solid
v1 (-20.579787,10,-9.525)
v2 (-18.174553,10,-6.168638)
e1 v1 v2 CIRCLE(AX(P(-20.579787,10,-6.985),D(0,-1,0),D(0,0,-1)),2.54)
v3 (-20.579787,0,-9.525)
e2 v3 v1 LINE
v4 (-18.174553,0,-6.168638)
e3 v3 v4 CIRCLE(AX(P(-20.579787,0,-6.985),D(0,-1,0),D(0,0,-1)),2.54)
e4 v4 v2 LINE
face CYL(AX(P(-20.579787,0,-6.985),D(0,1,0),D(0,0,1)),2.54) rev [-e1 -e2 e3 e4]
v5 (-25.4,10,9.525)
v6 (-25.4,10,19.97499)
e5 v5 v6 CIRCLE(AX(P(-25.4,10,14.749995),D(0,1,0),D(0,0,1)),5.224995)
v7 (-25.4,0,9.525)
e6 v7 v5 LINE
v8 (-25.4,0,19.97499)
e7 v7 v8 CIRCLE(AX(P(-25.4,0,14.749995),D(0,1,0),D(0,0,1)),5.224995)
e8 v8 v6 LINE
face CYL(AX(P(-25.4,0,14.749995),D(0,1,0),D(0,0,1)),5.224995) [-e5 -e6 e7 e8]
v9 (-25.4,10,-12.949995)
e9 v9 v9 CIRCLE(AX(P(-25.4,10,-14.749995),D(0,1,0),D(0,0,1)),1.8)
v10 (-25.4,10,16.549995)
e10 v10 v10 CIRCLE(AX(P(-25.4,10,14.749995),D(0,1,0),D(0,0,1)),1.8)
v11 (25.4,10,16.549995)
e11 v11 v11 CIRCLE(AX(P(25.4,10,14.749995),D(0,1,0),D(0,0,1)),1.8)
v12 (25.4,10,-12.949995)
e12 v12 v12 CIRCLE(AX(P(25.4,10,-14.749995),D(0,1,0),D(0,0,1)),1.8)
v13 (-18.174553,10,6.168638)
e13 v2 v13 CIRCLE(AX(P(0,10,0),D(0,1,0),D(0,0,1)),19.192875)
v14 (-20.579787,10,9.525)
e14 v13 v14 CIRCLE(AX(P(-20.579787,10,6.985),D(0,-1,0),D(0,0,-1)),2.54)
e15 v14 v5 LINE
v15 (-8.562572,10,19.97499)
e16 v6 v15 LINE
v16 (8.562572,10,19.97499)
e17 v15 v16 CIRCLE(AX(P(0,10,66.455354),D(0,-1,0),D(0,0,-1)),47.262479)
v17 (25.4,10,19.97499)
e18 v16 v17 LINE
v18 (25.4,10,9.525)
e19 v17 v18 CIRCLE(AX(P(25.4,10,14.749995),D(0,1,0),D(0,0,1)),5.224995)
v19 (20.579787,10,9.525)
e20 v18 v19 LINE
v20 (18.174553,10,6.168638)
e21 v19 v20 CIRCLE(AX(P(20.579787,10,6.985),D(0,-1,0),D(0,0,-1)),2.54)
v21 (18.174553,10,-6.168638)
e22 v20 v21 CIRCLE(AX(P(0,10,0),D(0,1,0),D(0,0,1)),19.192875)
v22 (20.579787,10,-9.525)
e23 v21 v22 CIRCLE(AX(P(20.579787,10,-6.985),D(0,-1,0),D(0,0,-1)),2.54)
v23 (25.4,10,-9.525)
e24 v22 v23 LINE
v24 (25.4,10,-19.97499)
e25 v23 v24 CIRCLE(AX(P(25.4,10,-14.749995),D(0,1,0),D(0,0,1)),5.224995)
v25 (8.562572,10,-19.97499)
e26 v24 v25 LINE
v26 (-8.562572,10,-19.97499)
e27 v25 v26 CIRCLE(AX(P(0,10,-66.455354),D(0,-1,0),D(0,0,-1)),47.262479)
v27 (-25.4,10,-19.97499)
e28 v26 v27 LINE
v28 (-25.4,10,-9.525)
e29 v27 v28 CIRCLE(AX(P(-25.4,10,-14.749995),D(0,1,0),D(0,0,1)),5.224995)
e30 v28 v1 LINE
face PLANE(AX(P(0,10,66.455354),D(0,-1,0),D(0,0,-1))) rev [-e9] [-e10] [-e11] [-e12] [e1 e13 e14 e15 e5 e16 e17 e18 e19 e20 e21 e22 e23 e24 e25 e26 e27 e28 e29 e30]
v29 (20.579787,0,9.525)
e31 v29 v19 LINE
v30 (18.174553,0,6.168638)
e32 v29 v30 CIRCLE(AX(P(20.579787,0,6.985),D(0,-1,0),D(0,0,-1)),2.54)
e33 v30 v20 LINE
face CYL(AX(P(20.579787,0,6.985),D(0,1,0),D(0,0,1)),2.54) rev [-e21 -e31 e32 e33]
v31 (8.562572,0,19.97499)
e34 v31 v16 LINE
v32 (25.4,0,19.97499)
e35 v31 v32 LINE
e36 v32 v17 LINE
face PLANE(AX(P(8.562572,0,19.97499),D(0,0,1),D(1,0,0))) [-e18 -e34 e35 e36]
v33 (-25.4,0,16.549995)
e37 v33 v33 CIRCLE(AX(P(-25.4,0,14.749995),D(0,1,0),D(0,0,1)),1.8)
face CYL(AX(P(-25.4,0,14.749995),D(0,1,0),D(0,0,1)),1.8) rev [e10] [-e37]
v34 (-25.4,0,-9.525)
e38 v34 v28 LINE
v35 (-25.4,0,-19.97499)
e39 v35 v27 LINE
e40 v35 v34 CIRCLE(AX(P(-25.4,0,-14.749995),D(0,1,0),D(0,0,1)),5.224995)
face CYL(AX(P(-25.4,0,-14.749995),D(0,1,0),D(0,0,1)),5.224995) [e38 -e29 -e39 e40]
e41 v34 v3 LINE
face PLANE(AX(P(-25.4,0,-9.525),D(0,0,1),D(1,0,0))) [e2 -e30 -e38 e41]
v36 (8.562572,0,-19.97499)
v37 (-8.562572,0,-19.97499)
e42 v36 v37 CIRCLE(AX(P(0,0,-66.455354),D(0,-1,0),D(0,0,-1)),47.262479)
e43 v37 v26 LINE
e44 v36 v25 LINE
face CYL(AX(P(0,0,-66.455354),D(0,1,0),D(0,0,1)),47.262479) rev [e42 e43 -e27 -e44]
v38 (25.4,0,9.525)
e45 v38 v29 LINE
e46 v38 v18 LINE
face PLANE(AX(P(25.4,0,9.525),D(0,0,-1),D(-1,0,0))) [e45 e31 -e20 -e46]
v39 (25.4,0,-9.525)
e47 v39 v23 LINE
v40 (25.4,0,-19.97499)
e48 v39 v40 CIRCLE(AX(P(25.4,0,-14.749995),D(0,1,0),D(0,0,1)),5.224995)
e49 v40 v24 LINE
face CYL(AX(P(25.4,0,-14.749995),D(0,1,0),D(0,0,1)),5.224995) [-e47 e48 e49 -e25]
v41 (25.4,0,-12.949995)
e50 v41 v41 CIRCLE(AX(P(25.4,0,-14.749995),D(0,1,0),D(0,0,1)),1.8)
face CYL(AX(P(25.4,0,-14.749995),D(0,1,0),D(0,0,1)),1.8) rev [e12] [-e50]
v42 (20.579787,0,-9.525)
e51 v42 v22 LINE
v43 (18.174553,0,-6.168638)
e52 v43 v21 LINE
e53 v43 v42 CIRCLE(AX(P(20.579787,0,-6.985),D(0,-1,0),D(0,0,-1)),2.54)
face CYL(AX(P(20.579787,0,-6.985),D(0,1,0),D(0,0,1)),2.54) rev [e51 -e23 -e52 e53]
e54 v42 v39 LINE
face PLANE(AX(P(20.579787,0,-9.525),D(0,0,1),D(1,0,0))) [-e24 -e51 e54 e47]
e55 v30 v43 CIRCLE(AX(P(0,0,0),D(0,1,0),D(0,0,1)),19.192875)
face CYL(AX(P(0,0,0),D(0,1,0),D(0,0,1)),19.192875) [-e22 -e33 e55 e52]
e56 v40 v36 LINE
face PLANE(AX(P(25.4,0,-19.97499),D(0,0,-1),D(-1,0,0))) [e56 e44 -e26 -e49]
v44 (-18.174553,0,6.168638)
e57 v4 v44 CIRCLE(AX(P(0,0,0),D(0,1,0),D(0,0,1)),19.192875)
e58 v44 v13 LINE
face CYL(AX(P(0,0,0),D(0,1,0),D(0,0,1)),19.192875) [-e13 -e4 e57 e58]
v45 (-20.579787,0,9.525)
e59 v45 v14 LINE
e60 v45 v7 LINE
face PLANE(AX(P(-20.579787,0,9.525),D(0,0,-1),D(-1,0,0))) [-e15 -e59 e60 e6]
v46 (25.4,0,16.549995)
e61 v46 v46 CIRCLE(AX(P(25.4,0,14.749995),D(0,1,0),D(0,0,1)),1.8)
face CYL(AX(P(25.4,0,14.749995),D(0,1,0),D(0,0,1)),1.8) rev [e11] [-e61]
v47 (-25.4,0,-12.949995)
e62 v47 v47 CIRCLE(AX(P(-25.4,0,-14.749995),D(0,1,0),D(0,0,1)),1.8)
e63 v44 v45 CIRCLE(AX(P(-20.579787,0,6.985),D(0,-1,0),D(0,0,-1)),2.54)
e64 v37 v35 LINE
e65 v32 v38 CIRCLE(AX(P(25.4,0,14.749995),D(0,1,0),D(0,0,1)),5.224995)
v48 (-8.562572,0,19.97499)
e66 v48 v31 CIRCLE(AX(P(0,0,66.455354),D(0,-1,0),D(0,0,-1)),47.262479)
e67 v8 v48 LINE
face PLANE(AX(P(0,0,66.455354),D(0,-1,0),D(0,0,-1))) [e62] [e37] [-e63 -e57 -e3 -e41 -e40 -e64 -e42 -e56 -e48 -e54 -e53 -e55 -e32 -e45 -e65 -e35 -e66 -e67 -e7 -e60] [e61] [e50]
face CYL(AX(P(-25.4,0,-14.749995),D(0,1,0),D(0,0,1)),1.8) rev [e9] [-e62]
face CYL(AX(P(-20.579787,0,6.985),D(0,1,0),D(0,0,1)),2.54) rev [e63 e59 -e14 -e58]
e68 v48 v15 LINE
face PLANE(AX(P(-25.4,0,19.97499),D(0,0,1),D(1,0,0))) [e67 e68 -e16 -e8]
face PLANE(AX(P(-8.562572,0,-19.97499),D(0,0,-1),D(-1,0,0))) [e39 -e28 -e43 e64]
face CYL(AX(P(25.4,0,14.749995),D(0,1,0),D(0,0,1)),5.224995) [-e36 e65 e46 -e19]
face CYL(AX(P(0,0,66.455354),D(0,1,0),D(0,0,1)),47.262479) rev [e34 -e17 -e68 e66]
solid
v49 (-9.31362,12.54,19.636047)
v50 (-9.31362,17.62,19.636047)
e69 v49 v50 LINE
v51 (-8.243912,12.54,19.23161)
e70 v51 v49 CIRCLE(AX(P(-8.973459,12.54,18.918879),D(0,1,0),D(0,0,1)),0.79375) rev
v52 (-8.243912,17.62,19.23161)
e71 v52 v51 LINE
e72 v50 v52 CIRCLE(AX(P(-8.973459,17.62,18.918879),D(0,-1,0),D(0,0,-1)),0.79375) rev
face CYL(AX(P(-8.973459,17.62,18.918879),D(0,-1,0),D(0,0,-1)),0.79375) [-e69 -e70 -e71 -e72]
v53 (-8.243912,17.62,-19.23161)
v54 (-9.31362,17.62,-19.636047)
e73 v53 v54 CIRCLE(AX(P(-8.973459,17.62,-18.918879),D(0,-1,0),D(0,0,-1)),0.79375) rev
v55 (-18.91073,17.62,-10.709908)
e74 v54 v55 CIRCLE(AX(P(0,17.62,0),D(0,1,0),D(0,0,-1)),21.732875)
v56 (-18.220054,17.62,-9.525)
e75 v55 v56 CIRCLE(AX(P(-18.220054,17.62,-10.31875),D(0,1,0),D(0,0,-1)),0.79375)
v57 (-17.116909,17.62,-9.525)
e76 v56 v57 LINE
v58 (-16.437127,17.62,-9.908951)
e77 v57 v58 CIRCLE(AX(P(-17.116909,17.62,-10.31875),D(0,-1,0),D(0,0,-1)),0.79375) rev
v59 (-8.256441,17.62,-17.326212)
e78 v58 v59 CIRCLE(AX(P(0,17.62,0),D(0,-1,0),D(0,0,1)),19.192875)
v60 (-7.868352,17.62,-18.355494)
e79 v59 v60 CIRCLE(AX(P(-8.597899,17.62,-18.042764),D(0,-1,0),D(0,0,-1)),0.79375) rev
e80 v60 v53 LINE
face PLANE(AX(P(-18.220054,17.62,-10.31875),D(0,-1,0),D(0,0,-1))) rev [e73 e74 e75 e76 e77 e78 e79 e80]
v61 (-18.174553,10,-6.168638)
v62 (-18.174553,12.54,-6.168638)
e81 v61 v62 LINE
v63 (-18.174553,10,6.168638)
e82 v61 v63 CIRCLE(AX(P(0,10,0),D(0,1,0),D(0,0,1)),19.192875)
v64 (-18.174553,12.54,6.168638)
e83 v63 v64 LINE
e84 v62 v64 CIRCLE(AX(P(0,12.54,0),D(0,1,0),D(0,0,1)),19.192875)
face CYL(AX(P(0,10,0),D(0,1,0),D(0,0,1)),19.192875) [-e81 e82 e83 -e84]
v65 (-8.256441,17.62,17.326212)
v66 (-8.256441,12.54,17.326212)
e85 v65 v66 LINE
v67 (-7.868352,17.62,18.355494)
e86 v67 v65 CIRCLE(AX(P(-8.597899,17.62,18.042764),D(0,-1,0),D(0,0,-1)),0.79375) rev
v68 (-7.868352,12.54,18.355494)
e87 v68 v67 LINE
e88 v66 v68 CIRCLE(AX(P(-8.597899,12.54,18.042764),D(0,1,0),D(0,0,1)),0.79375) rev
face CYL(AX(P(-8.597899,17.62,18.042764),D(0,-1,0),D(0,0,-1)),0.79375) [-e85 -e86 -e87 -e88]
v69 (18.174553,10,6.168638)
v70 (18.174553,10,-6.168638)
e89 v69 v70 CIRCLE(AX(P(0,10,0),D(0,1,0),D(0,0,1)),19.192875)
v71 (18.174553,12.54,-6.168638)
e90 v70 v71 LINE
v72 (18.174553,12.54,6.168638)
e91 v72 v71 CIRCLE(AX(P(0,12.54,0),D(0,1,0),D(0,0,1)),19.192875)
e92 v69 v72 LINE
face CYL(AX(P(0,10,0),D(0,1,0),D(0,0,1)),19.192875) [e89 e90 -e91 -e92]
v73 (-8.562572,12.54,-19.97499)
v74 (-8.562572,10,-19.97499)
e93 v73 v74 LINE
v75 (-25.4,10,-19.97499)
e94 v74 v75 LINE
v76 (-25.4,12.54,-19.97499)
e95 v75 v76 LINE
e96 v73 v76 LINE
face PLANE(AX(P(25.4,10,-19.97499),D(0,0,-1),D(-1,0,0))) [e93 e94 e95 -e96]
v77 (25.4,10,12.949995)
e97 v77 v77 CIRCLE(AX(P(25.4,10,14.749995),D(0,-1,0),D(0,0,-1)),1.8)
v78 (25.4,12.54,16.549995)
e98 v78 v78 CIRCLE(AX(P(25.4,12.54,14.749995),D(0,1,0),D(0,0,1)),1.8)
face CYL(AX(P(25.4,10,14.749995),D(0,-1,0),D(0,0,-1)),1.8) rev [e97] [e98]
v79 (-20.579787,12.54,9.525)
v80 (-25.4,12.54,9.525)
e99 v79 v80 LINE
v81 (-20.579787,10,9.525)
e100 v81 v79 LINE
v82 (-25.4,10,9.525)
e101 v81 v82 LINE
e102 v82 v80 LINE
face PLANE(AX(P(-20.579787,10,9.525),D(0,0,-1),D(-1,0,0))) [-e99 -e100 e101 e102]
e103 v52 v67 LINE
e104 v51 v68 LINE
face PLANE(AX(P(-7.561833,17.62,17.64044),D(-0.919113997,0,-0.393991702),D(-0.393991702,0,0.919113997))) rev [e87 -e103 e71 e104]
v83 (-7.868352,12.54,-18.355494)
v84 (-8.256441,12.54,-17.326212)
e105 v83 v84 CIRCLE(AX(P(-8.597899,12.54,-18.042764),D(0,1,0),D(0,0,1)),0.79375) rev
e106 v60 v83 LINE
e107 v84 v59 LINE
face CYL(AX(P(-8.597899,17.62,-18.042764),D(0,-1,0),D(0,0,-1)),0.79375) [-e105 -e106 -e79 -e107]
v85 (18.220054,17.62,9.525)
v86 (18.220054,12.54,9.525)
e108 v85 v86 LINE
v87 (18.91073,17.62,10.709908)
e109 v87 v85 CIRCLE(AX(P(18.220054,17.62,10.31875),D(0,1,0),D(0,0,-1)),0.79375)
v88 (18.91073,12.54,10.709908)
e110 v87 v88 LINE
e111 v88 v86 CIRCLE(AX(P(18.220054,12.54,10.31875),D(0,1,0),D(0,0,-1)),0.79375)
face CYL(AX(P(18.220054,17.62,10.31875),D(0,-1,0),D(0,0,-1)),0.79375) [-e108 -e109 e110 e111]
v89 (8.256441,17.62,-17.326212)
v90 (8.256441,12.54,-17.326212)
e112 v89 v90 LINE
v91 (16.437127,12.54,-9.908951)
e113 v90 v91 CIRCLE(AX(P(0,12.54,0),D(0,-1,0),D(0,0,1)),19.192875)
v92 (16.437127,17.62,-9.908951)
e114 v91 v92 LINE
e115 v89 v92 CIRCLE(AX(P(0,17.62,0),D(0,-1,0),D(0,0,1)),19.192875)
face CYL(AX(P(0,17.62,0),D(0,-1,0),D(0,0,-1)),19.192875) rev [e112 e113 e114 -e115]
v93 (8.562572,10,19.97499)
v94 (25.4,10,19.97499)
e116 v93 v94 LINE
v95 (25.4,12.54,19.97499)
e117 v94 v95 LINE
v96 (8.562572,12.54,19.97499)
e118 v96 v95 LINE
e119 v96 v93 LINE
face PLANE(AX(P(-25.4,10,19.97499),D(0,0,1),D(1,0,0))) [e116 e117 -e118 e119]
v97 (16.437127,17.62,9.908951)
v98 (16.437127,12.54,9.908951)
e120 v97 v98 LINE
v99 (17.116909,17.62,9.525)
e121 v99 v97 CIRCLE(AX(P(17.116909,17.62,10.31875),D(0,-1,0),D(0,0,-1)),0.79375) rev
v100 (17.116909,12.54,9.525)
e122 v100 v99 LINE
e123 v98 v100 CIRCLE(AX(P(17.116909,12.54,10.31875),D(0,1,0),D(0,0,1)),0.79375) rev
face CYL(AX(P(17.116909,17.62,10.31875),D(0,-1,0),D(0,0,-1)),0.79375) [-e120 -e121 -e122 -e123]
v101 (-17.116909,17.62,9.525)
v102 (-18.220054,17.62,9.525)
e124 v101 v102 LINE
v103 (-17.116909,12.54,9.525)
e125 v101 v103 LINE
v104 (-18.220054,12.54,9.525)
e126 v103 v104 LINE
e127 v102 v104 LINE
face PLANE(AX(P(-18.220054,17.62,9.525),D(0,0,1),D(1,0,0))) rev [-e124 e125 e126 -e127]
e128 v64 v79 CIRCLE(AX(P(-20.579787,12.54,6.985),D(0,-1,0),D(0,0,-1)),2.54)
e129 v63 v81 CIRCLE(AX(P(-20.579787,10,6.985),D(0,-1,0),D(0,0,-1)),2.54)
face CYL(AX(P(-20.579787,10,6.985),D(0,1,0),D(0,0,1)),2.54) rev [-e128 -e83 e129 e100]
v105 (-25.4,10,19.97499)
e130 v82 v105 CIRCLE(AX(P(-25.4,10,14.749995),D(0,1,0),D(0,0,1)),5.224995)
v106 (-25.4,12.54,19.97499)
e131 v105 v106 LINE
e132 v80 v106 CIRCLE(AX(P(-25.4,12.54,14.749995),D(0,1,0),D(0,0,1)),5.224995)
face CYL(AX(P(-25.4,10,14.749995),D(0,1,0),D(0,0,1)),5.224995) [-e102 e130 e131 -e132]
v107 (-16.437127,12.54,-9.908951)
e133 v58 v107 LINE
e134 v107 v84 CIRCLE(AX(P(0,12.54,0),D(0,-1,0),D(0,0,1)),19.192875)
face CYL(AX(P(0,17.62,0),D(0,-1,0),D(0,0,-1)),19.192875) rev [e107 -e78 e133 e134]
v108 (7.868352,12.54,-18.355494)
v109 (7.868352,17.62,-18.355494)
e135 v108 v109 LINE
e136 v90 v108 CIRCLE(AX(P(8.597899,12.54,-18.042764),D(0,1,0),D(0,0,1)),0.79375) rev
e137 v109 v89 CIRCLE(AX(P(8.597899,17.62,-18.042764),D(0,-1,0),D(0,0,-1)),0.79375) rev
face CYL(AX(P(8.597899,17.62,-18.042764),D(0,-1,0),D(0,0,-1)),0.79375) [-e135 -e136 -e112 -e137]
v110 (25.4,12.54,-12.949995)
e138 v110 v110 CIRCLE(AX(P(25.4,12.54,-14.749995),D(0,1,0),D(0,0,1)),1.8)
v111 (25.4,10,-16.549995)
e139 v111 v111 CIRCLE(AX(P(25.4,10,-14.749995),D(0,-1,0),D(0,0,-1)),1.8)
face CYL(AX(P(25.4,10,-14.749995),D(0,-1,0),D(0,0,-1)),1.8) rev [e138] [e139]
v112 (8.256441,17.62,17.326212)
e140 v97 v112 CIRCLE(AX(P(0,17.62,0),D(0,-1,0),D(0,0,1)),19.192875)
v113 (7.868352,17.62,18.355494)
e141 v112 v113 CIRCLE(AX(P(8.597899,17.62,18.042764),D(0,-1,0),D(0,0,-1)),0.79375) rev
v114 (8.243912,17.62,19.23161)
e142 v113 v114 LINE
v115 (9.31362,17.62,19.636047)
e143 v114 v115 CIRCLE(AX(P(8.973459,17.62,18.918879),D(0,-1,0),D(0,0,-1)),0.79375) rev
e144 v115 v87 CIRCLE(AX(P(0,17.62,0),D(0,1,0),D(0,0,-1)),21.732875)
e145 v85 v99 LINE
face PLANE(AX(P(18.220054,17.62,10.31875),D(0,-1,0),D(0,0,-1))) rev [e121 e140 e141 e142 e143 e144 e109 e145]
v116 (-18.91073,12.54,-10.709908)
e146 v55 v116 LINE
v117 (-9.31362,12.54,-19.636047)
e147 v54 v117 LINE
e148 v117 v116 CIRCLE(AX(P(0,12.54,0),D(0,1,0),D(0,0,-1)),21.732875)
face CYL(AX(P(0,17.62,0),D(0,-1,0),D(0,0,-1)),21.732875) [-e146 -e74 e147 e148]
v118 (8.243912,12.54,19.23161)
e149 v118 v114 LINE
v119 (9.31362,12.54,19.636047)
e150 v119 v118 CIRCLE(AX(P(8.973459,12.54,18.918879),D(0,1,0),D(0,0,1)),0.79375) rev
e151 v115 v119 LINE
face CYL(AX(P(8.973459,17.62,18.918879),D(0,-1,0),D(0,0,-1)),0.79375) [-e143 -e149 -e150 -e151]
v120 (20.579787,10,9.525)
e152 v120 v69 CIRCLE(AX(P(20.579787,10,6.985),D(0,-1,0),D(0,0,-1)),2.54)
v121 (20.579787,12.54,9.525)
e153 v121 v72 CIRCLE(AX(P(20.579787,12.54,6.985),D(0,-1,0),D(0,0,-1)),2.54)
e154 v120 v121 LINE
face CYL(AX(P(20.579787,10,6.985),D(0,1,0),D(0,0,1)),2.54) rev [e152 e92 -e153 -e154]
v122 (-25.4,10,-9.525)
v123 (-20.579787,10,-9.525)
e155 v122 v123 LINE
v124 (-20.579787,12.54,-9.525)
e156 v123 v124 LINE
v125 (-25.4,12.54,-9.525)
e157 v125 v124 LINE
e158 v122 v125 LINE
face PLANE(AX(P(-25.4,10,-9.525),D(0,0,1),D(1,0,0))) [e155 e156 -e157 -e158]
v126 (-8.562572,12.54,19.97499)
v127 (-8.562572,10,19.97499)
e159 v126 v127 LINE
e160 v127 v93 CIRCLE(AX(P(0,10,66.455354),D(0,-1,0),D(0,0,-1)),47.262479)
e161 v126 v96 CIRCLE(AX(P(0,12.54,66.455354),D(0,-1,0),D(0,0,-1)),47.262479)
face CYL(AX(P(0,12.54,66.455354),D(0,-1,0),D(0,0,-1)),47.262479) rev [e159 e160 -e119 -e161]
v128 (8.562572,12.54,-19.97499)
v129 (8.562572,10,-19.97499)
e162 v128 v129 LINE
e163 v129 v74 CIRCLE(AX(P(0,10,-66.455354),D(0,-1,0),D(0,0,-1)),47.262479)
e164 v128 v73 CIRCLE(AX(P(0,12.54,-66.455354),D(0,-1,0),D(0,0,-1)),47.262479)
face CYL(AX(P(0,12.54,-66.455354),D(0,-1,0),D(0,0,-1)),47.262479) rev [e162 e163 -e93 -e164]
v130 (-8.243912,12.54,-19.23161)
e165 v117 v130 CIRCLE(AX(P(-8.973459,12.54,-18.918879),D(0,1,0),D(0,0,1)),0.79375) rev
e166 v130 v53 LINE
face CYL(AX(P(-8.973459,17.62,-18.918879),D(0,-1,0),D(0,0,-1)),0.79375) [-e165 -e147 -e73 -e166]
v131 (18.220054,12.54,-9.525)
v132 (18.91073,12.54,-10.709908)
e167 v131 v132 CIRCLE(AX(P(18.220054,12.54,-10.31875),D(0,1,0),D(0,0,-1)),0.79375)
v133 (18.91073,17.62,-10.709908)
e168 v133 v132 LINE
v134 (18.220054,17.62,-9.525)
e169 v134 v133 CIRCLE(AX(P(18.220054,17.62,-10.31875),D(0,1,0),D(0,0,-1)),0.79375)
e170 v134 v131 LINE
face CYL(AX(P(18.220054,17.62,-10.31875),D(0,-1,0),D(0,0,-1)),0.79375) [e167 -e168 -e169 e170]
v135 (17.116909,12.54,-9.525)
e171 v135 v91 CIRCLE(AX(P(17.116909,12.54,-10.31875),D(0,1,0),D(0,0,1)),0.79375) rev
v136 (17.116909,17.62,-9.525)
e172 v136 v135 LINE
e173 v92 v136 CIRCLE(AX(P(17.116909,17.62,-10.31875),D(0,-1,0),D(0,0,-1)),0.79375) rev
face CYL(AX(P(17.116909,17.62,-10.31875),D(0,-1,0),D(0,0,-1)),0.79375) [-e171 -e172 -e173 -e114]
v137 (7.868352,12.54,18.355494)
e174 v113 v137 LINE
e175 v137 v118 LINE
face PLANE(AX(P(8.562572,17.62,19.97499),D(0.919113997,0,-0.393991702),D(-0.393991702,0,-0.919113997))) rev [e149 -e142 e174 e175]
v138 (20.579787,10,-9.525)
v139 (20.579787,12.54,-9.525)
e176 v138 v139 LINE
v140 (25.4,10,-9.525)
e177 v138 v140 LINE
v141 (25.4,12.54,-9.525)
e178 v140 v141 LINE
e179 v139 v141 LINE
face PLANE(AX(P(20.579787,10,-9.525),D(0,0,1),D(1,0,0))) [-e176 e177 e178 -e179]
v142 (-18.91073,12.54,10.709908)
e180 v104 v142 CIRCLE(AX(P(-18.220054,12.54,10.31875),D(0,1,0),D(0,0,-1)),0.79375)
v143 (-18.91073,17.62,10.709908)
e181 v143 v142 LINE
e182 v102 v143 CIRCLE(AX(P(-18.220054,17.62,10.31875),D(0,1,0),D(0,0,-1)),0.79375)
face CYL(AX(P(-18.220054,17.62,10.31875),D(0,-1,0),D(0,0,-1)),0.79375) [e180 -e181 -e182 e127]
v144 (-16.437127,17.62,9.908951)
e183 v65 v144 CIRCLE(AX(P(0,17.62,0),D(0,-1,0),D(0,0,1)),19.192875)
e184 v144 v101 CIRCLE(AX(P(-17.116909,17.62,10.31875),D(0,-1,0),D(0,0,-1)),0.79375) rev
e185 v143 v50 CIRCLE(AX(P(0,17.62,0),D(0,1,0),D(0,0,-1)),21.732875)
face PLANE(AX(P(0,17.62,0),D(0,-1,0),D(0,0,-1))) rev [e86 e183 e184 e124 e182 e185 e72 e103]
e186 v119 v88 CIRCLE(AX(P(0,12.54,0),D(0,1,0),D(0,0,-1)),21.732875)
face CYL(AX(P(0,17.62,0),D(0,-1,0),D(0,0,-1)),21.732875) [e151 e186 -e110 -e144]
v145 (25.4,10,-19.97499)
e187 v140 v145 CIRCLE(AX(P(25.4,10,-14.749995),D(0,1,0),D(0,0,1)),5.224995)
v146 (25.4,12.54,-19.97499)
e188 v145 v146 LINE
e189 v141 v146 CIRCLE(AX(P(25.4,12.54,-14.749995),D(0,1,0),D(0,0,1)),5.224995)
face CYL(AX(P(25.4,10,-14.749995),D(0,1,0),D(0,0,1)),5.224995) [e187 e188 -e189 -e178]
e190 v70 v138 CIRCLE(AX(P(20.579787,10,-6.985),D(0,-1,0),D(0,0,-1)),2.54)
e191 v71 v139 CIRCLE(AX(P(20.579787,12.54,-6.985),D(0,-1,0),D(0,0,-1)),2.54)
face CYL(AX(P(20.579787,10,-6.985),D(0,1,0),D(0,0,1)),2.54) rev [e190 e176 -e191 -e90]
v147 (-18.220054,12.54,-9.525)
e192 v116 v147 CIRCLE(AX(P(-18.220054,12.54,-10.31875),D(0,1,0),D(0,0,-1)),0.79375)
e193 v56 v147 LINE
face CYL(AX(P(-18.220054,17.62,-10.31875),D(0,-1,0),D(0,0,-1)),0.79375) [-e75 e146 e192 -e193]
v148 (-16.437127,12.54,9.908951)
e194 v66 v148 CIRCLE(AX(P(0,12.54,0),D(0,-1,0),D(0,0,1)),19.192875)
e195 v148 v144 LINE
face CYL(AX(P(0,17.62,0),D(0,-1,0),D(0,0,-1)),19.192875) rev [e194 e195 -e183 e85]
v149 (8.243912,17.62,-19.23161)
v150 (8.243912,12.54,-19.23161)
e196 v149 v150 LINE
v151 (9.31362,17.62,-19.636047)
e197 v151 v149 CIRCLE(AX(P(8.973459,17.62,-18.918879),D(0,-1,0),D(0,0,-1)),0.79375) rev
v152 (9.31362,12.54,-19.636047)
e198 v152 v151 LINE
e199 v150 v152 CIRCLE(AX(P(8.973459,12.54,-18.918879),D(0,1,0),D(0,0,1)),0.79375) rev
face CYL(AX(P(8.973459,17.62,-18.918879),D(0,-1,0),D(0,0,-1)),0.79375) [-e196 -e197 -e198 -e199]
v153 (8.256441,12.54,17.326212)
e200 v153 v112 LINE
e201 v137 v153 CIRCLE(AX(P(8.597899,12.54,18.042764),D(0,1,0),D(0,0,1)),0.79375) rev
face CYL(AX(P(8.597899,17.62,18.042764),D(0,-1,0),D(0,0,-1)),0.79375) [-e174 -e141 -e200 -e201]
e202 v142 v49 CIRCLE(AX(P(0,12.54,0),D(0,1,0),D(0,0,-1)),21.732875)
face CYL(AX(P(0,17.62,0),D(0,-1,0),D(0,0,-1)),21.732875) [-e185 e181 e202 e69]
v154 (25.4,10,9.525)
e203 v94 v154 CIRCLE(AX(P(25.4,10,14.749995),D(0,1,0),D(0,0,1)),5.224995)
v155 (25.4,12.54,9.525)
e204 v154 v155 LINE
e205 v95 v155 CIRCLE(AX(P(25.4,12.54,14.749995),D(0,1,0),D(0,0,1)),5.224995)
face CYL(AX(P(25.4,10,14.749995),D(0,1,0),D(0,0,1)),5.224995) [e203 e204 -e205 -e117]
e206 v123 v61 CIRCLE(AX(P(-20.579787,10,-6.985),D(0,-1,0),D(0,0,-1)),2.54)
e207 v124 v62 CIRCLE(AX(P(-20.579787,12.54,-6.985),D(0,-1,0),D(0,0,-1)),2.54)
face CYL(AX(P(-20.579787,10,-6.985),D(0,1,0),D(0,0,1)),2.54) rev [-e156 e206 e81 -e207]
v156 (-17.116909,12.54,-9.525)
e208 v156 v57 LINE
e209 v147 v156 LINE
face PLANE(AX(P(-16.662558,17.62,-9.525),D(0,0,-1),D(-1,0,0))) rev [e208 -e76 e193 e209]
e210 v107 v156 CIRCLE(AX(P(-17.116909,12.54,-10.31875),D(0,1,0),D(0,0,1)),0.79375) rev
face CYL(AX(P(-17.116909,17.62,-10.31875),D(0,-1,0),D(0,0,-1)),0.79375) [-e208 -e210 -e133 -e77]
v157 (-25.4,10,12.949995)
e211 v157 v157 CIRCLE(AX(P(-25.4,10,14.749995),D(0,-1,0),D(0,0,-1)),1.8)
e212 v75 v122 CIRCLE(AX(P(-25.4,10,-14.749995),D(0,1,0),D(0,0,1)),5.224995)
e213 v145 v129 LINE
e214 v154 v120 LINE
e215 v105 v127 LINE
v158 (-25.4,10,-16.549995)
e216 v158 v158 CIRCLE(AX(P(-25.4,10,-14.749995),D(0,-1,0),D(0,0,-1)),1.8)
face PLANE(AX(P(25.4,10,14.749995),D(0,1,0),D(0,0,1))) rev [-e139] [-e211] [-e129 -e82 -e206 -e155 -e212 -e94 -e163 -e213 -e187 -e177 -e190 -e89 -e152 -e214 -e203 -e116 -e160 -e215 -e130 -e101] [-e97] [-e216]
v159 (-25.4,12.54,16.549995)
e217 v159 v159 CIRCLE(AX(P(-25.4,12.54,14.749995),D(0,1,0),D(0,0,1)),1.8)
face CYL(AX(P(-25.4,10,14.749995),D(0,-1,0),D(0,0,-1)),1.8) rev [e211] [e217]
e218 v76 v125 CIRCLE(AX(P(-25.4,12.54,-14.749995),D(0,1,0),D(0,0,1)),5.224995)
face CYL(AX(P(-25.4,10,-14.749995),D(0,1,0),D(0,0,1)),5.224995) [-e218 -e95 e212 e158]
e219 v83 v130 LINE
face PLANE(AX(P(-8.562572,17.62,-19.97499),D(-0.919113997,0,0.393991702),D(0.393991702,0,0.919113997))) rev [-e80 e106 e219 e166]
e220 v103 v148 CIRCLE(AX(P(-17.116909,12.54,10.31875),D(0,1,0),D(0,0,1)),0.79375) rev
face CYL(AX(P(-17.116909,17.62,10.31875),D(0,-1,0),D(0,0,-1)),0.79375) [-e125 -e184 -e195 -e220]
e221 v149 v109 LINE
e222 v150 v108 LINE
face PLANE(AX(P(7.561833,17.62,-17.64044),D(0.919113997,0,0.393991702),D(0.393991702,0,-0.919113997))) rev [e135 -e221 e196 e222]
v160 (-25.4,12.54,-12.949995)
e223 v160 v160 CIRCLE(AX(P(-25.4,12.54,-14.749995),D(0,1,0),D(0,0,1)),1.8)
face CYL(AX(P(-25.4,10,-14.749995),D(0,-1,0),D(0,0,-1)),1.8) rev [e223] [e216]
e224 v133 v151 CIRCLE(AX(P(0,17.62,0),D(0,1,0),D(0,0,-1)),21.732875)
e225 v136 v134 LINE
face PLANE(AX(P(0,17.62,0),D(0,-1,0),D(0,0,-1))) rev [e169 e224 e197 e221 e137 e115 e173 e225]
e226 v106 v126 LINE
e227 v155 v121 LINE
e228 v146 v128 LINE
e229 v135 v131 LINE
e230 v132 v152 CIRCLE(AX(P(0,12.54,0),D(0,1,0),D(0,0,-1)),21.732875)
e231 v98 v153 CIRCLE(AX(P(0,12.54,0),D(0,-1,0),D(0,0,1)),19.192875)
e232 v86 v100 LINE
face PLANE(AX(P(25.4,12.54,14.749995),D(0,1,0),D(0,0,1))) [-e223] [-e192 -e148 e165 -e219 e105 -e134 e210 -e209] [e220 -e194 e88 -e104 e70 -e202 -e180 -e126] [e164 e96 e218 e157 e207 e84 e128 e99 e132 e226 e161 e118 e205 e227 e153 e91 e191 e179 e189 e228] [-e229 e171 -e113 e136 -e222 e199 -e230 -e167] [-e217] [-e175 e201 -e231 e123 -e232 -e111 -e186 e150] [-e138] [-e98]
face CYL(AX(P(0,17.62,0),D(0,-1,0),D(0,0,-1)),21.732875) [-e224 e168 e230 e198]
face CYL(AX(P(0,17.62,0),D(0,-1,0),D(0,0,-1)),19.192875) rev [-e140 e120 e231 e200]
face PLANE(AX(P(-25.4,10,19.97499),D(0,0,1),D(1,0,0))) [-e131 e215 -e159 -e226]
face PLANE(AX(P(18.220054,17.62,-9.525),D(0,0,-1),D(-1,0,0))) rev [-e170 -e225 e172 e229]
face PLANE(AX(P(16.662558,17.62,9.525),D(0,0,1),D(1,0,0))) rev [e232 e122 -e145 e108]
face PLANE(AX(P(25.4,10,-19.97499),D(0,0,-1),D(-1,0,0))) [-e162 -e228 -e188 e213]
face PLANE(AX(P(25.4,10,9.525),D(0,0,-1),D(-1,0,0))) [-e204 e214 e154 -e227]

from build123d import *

# Parameters (mm, degrees)
SKETCH13_R                          = 1.8
BOSS_EXTRUDE6_DEPTH                 = 10
BOSS_EXTRUDE7_DEPTH                 = 2.54
CUT_EXTRUDE3_DEPTH                  = 38.906338731
CUT_EXTRUDE4_DEPTH                  = 38.906338731
BOSS_EXTRUDE8_START                 = 5.08
BOSS_EXTRUDE8_DEPTH                 = 5.08
BOSS_EXTRUDE9_START                 = 5.08
BOSS_EXTRUDE9_DEPTH                 = 5.08
BOSS_EXTRUDE10_START                = 5.08
BOSS_EXTRUDE10_DEPTH                = 5.08
BOSS_EXTRUDE11_START                = 5.08
BOSS_EXTRUDE11_DEPTH                = 5.08
SKETCH40_W                          = 1.8
SKETCH40_H                          = 7.62
F_3_6_3_6_DIAMETER_HOLE2_AT_2_COUNT = 2
F_3_6_3_6_DIAMETER_HOLE2_AT_2_PITCH = 29.4999896
F_3_6_3_6_DIAMETER_HOLE2_AT_3_COUNT = 2
F_3_6_3_6_DIAMETER_HOLE2_AT_3_PITCH = 58.744271094
F_3_6_3_6_DIAMETER_HOLE2_AT_4_COUNT = 2
F_3_6_3_6_DIAMETER_HOLE2_AT_4_PITCH = 50.8
FILLET2_START                       = 12.54
FILLET2_DEPTH                       = 6.46


with BuildPart() as part:
    # Sketch13 → Boss-Extrude6 (new body)
    with BuildSketch(Plane(origin=(0, 10, 0), x_dir=(1, 0, 0), z_dir=(0, 1, 0))):
        with BuildLine():
            Line((8.562572408, -19.9749896), (25.4, -19.9749896))
            ThreePointArc((25.4, -19.9749896), (30.6249948, -14.7499948), (25.4, -9.525))
            Line((25.4, -9.525), (20.579786947, -9.525))
            ThreePointArc((20.579786947, -9.525), (18.515185258, -8.464533666), (18.174552534, -6.168637692))
            ThreePointArc((18.174552534, -6.168637692), (19.192875, 0), (18.174552534, 6.168637692))
            ThreePointArc((18.174552534, 6.168637692), (18.515185258, 8.464533666), (20.579786947, 9.525))
            Line((20.579786947, 9.525), (25.4, 9.525))
            ThreePointArc((25.4, 9.525), (30.6249948, 14.7499948), (25.4, 19.9749896))
            Line((25.4, 19.9749896), (8.562572408, 19.9749896))
            ThreePointArc((8.562572408, 19.9749896), (0, 19.192875), (-8.562572408, 19.9749896))
            Line((-8.562572408, 19.9749896), (-25.4, 19.9749896))
            ThreePointArc((-25.4, 19.9749896), (-30.6249948, 14.7499948), (-25.4, 9.525))
            Line((-25.4, 9.525), (-20.579786947, 9.525))
            ThreePointArc((-20.579786947, 9.525), (-18.515185258, 8.464533666), (-18.174552534, 6.168637692))
            ThreePointArc((-18.174552534, 6.168637692), (-19.192875, 0), (-18.174552534, -6.168637692))
            ThreePointArc((-18.174552534, -6.168637692), (-18.515185258, -8.464533666), (-20.579786947, -9.525))
            Line((-20.579786947, -9.525), (-25.4, -9.525))
            ThreePointArc((-25.4, -9.525), (-30.6249948, -14.7499948), (-25.4, -19.9749896))
            Line((-25.4, -19.9749896), (-8.562572408, -19.9749896))
            ThreePointArc((-8.562572408, -19.9749896), (0, -19.192875), (8.562572408, -19.9749896))
        make_face()
        with Locations(Location((25.4, -14.7499948, 0), (0, 0, 270))):
            Circle(SKETCH13_R, mode=Mode.SUBTRACT)
        with Locations(Location((-25.4, 14.7499948, 0), (0, 0, 270))):
            Circle(SKETCH13_R, mode=Mode.SUBTRACT)
        with Locations(Location((-25.4, -14.7499948, 0), (0, 0, 270))):
            Circle(SKETCH13_R, mode=Mode.SUBTRACT)
        with Locations(Location((25.4, 14.7499948, 0), (0, 0, 270))):
            Circle(SKETCH13_R, mode=Mode.SUBTRACT)
    extrude(amount=-BOSS_EXTRUDE6_DEPTH)


with BuildPart() as body_2:
    # Sketch18 → Boss-Extrude7 (new body)
    with BuildSketch(Plane(origin=(0, 12.54, 0), x_dir=(1, 0, 0), z_dir=(0, 1, 0))):
        with BuildLine():
            Line((-25.4, -19.9749896), (25.4, -19.9749896))
            ThreePointArc((25.4, -19.9749896), (30.6249948, -14.7499948), (25.4, -9.525))
            Line((25.4, -9.525), (20.579786947, -9.525))
            ThreePointArc((20.579786947, -9.525), (18.515185258, -8.464533666), (18.174552534, -6.168637692))
            ThreePointArc((18.174552534, -6.168637692), (19.192875, 0), (18.174552534, 6.168637692))
            ThreePointArc((18.174552534, 6.168637692), (18.515185258, 8.464533666), (20.579786947, 9.525))
            Line((20.579786947, 9.525), (25.4, 9.525))
            ThreePointArc((25.4, 9.525), (30.6249948, 14.7499948), (25.4, 19.9749896))
            Line((25.4, 19.9749896), (-25.4, 19.9749896))
            ThreePointArc((-25.4, 19.9749896), (-30.6249948, 14.7499948), (-25.4, 9.525))
            Line((-25.4, 9.525), (-20.579786947, 9.525))
            ThreePointArc((-20.579786947, 9.525), (-18.515185258, 8.464533666), (-18.174552534, 6.168637692))
            ThreePointArc((-18.174552534, 6.168637692), (-19.192875, 0), (-18.174552534, -6.168637692))
            ThreePointArc((-18.174552534, -6.168637692), (-18.515185258, -8.464533666), (-20.579786947, -9.525))
            Line((-20.579786947, -9.525), (-25.4, -9.525))
            ThreePointArc((-25.4, -9.525), (-30.6249948, -14.7499948), (-25.4, -19.9749896))
        make_face()
    extrude(amount=-BOSS_EXTRUDE7_DEPTH)

    # Sketch19 → Cut-Extrude3 (cut, through all)
    with BuildSketch(Plane.XZ.offset(-10)):
        with BuildLine():
            Line((-8.562572408, -19.9749896), (8.562572408, -19.9749896))
            ThreePointArc((8.562572408, -19.9749896), (0, -19.192875), (-8.562572408, -19.9749896))
        make_face()
    extrude(amount=-CUT_EXTRUDE3_DEPTH, mode=Mode.SUBTRACT)

    # Sketch25 → Cut-Extrude4 (cut, through all)
    with BuildSketch(Plane(origin=(0, 10, 0), x_dir=(-1, 0, 0), z_dir=(0, -1, 0))):
        with BuildLine():
            Line((-8.562572408, -19.9749896), (8.562572408, -19.9749896))
            ThreePointArc((8.562572408, -19.9749896), (0, -19.192875), (-8.562572408, -19.9749896))
        make_face()
    extrude(amount=-CUT_EXTRUDE4_DEPTH, mode=Mode.SUBTRACT)

    # Sketch31 → Boss-Extrude8 (add)
    with BuildSketch(Plane(origin=(0, 12.54, 0), x_dir=(1, 0, 0), z_dir=(0, 1, 0)).offset(BOSS_EXTRUDE8_START)):
        with BuildLine():
            Line((8.562572408, -19.9749896), (7.561833485, -17.640440049))
            ThreePointArc((7.561833485, -17.640440049), (12.7738159, -14.324666771), (16.6625576, -9.525))
            Line((16.6625576, -9.525), (18.220053628, -9.525))
            ThreePointArc((18.220053628, -9.525), (18.905808972, -9.919026758), (18.910730414, -10.709908074))
            ThreePointArc((18.910730414, -10.709908074), (14.496759152, -16.191412225), (8.562572408, -19.9749896))
        make_face()
    extrude(amount=-BOSS_EXTRUDE8_DEPTH)

    # Sketch32 → Boss-Extrude9 (add)
    with BuildSketch(Plane(origin=(0, 12.54, 0), x_dir=(-1, 0, 0), z_dir=(0, 1, 0)).offset(BOSS_EXTRUDE9_START)):
        with BuildLine():
            Line((-18.220053628, -9.525), (-16.6625576, -9.525))
            ThreePointArc((-16.6625576, -9.525), (-12.7738159, -14.324666771), (-7.561833485, -17.640440049))
            Line((-7.561833485, -17.640440049), (-8.562572408, -19.9749896))
            ThreePointArc((-8.562572408, -19.9749896), (-14.496759152, -16.191412225), (-18.910730414, -10.709908074))
            ThreePointArc((-18.910730414, -10.709908074), (-18.905808972, -9.919026758), (-18.220053628, -9.525))
        make_face()
    extrude(amount=-BOSS_EXTRUDE9_DEPTH)

    # Sketch33 → Boss-Extrude10 (add)
    with BuildSketch(Plane(origin=(0, 12.54, 0), x_dir=(-1, 0, 0), z_dir=(0, 1, 0)).offset(BOSS_EXTRUDE10_START)):
        with BuildLine():
            Line((8.562572408, -19.9749896), (7.561833485, -17.640440049))
            ThreePointArc((7.561833485, -17.640440049), (12.7738159, -14.324666771), (16.6625576, -9.525))
            Line((16.6625576, -9.525), (18.220053628, -9.525))
            ThreePointArc((18.220053628, -9.525), (18.905808972, -9.919026758), (18.910730414, -10.709908074))
            ThreePointArc((18.910730414, -10.709908074), (14.496759152, -16.191412225), (8.562572408, -19.9749896))
        make_face()
    extrude(amount=-BOSS_EXTRUDE10_DEPTH)

    # Sketch39 → Boss-Extrude11 (add)
    with BuildSketch(Plane(origin=(0, 12.54, 0), x_dir=(1, 0, 0), z_dir=(0, 1, 0)).offset(BOSS_EXTRUDE11_START)):
        with BuildLine():
            Line((-18.220053628, -9.525), (-16.6625576, -9.525))
            ThreePointArc((-16.6625576, -9.525), (-12.7738159, -14.324666771), (-7.561833485, -17.640440049))
            Line((-7.561833485, -17.640440049), (-8.562572408, -19.9749896))
            ThreePointArc((-8.562572408, -19.9749896), (-14.496759152, -16.191412225), (-18.910730414, -10.709908074))
            ThreePointArc((-18.910730414, -10.709908074), (-18.905808972, -9.919026758), (-18.220053628, -9.525))
        make_face()
    extrude(amount=-BOSS_EXTRUDE11_DEPTH)

    # Sketch40 → Ø3.6 (3.6) Diameter Hole2 (revolve, cut)
    with BuildSketch(Plane(origin=(25.4, 10, 14.7499948), x_dir=(0, 0, -1), z_dir=(1, 0, 0))):
        with Locations((0.9, 3.81)):
            Rectangle(SKETCH40_W, SKETCH40_H)
    f_3_6_3_6_diameter_hole2 = revolve(axis=Axis((25.4, 3.65, 14.7499948), (0, 1, 0)), mode=Mode.SUBTRACT)

    # Ø3.6 (3.6) Diameter Hole2 at 2: Ø3.6 (3.6) Diameter Hole2 ×2
    with Locations(*[(0, 0, -i * F_3_6_3_6_DIAMETER_HOLE2_AT_2_PITCH) for i in range(1, F_3_6_3_6_DIAMETER_HOLE2_AT_2_COUNT)]):
        add(f_3_6_3_6_diameter_hole2, mode=Mode.SUBTRACT)

    # Ø3.6 (3.6) Diameter Hole2 at 3: Ø3.6 (3.6) Diameter Hole2 ×2
    with Locations(*[Vector(-0.8647651771601071, 0, -0.5021764514304196) * (i * F_3_6_3_6_DIAMETER_HOLE2_AT_3_PITCH) for i in range(1, F_3_6_3_6_DIAMETER_HOLE2_AT_3_COUNT)]):
        add(f_3_6_3_6_diameter_hole2, mode=Mode.SUBTRACT)

    # Ø3.6 (3.6) Diameter Hole2 at 4: Ø3.6 (3.6) Diameter Hole2 ×2
    with Locations(*[(-i * F_3_6_3_6_DIAMETER_HOLE2_AT_4_PITCH, 0, 0) for i in range(1, F_3_6_3_6_DIAMETER_HOLE2_AT_4_COUNT)]):
        add(f_3_6_3_6_diameter_hole2, mode=Mode.SUBTRACT)

    # Fillet2: read off the stored shape, not the designer's step
    # Fillet2 outline → Fillet2 (cut)
    with BuildSketch(Plane(origin=(0, 0, 0), x_dir=(1, 0, 0), z_dir=(0, 1, 0)).offset(FILLET2_START)):
        with BuildLine():
            Line((-8.562572408, -19.9749896), (-8.243911939, -19.231610246))
            ThreePointArc((-8.243911939, -19.231610246), (-8.692749802, -19.66133579), (-9.31362011, -19.636046858))
            ThreePointArc((-9.31362011, -19.636046858), (-8.939702751, -19.809077982), (-8.562572408, -19.9749896))
        make_face()
        with BuildLine():
            ThreePointArc((-17.116909106, -9.525), (-16.726549814, -9.627621441), (-16.437127171, -9.908950556))
            ThreePointArc((-16.437127171, -9.908950556), (-16.550955788, -9.717628994), (-16.6625576, -9.525))
            Line((-16.6625576, -9.525), (-17.116909106, -9.525))
        make_face()
        with BuildLine():
            ThreePointArc((-8.256441319, -17.326212151), (-7.855188873, -17.762725914), (-7.868352041, -18.355494436))
            Line((-7.868352041, -18.355494436), (-7.561833485, -17.640440049))
            ThreePointArc((-7.561833485, -17.640440049), (-7.910697772, -17.486775333), (-8.256441319, -17.326212151))
        make_face()
        with BuildLine():
            ThreePointArc((-8.562572408, 19.9749896), (-8.939702751, 19.809077982), (-9.31362011, 19.636046858))
            ThreePointArc((-9.31362011, 19.636046858), (-8.692749802, 19.66133579), (-8.243911939, 19.231610246))
            Line((-8.243911939, 19.231610246), (-8.562572408, 19.9749896))
        make_face()
        with BuildLine():
            ThreePointArc((-16.6625576, 9.525), (-16.550955788, 9.717628994), (-16.437127171, 9.908950556))
            ThreePointArc((-16.437127171, 9.908950556), (-16.726549814, 9.627621441), (-17.116909106, 9.525))
            Line((-17.116909106, 9.525), (-16.6625576, 9.525))
        make_face()
        with BuildLine():
            Line((-7.561833485, 17.640440049), (-7.868352041, 18.355494436))
            ThreePointArc((-7.868352041, 18.355494436), (-7.855188873, 17.762725914), (-8.256441319, 17.326212151))
            ThreePointArc((-8.256441319, 17.326212151), (-7.910697772, 17.486775333), (-7.561833485, 17.640440049))
        make_face()
        with BuildLine():
            Line((8.562572408, 19.9749896), (8.243911939, 19.231610246))
            ThreePointArc((8.243911939, 19.231610246), (8.692749802, 19.66133579), (9.31362011, 19.636046858))
            ThreePointArc((9.31362011, 19.636046858), (8.939702751, 19.809077982), (8.562572408, 19.9749896))
        make_face()
        with BuildLine():
            ThreePointArc((17.116909106, 9.525), (16.726549814, 9.627621441), (16.437127171, 9.908950556))
            ThreePointArc((16.437127171, 9.908950556), (16.550955788, 9.717628994), (16.6625576, 9.525))
            Line((16.6625576, 9.525), (17.116909106, 9.525))
        make_face()
        with BuildLine():
            ThreePointArc((8.256441319, 17.326212151), (7.855188873, 17.762725914), (7.868352041, 18.355494436))
            Line((7.868352041, 18.355494436), (7.561833485, 17.640440049))
            ThreePointArc((7.561833485, 17.640440049), (7.910697772, 17.486775333), (8.256441319, 17.326212151))
        make_face()
        with BuildLine():
            ThreePointArc((16.6625576, -9.525), (16.550955788, -9.717628994), (16.437127171, -9.908950556))
            ThreePointArc((16.437127171, -9.908950556), (16.726549814, -9.627621441), (17.116909106, -9.525))
            Line((17.116909106, -9.525), (16.6625576, -9.525))
        make_face()
        with BuildLine():
            ThreePointArc((9.31362011, -19.636046858), (8.692749802, -19.66133579), (8.243911939, -19.231610246))
            Line((8.243911939, -19.231610246), (8.562572408, -19.9749896))
            ThreePointArc((8.562572408, -19.9749896), (8.939702751, -19.809077982), (9.31362011, -19.636046858))
        make_face()
        with BuildLine():
            ThreePointArc((7.868352041, -18.355494436), (7.855188873, -17.762725914), (8.256441319, -17.326212151))
            ThreePointArc((8.256441319, -17.326212151), (7.910697772, -17.486775333), (7.561833485, -17.640440049))
            Line((7.561833485, -17.640440049), (7.868352041, -18.355494436))
        make_face()
    extrude(amount=FILLET2_DEPTH, mode=Mode.SUBTRACT)


solid = Compound([part.part, body_2.part])
